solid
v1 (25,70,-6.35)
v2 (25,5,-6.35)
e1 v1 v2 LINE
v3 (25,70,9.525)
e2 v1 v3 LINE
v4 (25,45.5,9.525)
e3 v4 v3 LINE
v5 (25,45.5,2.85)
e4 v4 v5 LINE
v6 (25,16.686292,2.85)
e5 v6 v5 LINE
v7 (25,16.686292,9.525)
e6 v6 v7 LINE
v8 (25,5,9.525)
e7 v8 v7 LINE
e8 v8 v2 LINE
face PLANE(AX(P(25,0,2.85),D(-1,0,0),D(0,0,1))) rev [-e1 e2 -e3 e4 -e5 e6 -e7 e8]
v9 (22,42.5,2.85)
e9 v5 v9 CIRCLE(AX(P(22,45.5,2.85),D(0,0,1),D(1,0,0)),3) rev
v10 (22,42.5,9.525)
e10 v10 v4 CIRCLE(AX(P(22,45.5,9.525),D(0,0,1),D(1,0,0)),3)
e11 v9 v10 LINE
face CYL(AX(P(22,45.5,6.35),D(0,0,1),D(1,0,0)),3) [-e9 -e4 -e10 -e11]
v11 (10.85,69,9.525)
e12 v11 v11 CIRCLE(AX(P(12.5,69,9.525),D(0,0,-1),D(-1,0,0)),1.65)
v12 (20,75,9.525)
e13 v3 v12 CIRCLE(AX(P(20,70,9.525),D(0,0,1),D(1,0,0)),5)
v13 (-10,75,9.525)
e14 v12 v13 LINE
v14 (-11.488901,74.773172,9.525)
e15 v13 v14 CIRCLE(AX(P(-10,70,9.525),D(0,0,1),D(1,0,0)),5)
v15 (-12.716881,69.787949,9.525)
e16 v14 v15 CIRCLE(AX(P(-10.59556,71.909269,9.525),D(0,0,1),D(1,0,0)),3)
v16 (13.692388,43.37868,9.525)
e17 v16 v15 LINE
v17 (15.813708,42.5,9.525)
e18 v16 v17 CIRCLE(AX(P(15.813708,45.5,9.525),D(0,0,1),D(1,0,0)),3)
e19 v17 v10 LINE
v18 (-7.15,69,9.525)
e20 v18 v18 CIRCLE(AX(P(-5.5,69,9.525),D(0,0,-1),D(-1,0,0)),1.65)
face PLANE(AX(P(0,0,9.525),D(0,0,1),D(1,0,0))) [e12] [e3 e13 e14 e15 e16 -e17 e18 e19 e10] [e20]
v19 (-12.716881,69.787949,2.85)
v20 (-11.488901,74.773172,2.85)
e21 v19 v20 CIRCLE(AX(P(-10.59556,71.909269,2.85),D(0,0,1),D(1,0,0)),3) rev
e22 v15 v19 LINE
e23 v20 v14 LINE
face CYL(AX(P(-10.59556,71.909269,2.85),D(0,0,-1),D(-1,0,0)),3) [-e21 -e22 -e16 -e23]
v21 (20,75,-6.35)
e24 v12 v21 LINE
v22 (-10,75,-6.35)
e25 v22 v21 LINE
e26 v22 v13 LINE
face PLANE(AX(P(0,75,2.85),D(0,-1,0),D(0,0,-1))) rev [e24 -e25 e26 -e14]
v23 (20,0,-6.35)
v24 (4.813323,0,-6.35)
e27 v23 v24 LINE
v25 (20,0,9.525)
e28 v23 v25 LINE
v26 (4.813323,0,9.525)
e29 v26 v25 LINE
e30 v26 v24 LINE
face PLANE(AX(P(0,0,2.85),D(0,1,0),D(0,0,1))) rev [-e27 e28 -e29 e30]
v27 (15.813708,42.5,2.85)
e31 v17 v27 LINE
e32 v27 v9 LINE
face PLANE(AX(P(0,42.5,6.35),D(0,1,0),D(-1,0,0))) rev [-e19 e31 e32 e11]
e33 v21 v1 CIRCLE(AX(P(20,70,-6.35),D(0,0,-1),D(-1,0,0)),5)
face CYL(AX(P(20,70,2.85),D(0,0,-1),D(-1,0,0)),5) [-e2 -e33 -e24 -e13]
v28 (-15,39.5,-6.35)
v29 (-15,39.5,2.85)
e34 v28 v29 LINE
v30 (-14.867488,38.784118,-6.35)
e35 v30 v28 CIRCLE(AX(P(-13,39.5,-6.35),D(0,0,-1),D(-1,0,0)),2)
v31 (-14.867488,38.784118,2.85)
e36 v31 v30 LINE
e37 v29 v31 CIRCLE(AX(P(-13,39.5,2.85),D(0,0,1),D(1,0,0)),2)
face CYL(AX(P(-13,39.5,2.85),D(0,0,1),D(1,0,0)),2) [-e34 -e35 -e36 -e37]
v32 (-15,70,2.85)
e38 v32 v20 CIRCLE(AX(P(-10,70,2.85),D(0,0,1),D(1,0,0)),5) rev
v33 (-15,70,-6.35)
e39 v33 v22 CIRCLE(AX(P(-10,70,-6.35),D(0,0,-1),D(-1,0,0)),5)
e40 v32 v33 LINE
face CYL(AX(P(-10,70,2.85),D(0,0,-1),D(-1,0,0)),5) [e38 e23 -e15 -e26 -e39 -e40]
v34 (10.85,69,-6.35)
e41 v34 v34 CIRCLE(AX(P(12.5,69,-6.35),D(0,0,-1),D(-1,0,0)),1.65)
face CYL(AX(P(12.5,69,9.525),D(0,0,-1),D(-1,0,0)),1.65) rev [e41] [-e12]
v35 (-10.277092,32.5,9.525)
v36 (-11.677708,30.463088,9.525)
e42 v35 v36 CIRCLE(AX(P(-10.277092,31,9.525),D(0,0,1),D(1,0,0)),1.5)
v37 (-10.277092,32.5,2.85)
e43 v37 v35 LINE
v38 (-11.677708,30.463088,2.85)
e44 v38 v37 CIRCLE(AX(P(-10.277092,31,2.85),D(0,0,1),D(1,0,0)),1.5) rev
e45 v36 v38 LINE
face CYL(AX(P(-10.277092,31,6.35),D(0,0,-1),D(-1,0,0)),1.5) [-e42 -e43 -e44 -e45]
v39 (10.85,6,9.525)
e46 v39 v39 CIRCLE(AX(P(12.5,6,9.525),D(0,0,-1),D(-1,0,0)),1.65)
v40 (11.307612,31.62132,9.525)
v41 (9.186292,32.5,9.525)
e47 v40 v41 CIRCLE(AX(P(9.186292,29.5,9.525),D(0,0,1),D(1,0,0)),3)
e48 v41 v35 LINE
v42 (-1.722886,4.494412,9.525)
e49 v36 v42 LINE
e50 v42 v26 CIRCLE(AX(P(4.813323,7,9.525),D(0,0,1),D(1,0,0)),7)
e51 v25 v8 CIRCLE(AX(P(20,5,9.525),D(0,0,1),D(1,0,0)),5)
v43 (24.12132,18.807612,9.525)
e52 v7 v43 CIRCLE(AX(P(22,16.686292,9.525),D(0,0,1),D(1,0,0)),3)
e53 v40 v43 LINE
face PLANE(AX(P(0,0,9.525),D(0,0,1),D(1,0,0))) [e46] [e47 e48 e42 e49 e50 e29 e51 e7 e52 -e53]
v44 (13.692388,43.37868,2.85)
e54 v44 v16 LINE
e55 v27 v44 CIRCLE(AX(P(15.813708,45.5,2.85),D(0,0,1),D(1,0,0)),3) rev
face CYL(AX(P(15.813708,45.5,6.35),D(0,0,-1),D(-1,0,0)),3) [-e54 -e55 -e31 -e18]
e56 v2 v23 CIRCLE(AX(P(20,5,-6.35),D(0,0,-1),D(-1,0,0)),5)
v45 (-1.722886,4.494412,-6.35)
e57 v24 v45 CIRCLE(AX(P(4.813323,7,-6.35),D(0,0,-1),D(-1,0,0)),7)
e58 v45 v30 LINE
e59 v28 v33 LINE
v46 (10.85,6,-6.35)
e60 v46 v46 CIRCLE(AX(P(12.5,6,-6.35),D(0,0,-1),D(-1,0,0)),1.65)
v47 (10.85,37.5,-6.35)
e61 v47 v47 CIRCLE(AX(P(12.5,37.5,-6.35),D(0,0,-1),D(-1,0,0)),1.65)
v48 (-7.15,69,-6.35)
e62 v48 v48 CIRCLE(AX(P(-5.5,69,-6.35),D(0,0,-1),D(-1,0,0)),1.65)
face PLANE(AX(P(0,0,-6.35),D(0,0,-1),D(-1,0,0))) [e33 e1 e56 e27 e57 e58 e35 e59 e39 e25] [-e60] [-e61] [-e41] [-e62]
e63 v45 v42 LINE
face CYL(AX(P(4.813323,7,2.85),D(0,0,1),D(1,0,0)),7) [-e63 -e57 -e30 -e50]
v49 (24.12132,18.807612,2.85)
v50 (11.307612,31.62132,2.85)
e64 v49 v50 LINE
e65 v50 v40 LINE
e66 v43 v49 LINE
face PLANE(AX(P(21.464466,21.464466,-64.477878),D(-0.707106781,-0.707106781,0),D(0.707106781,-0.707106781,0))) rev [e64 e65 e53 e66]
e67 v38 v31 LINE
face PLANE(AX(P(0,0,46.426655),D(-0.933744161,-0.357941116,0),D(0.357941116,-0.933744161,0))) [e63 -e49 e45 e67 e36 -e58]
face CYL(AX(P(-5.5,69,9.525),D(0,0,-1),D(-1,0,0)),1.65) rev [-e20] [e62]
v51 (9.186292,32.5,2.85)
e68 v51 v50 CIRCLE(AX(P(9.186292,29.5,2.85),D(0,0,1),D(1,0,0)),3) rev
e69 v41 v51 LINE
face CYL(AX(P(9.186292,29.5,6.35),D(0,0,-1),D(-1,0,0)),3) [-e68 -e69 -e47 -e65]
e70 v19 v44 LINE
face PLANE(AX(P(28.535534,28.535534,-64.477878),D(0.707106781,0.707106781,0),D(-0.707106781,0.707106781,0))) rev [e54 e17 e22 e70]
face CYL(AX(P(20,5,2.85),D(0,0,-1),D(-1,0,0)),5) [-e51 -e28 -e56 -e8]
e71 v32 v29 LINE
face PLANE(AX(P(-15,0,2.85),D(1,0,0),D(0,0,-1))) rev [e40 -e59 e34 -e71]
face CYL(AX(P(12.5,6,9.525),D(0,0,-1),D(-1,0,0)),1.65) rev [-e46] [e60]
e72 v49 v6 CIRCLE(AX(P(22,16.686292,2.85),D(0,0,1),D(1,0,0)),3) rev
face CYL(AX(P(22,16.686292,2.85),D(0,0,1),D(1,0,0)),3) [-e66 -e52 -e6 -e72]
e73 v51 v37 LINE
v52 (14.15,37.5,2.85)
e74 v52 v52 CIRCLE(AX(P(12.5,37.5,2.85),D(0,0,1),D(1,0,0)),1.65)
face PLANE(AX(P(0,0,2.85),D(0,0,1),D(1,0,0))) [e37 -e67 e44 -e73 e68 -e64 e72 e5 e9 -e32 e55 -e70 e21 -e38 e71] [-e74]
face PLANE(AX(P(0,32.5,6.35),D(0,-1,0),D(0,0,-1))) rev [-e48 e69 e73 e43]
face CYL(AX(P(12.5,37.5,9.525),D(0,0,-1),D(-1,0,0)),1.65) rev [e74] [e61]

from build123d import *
from build123d.topology import SkipClean

# Parameters (mm, degrees)
SKETCH1_R           = 1.5
SKETCH1_W           = 15
SKETCH1_H           = 37.5
BOSS_EXTRUDE1_DEPTH = 2.85
FILLET1_R           = 5
FILLET2_R           = 2
BOSS_EXTRUDE2_START = 3.5
SKETCH5_R           = 1.5
BOSS_EXTRUDE2_DEPTH = 3.5
FILLET3_R           = 3.5
FILLET4_R           = 2
FILLET5_R           = 2
SKETCH6_R           = 1.5
CUT_EXTRUDE1_DEPTH  = 10
SKETCH8_R           = 1.5
BOSS_EXTRUDE3_DEPTH = 6.35
BOSS_EXTRUDE4_START = 3.175
SKETCH9_R           = 1.5
BOSS_EXTRUDE4_DEPTH = 3.175
SKETCH10_W          = 40
SKETCH10_H          = 15.399494937
SKETCH10_W_2        = 25
BOSS_EXTRUDE5_DEPTH = 6.675
CUT_EXTRUDE2_START  = -6.675
CUT_EXTRUDE2_DEPTH  = 6.675
BOSS_EXTRUDE6_START = -9.2
BOSS_EXTRUDE6_DEPTH = 9.2
FILLET6_R           = 7
BOSS_EXTRUDE7_DEPTH = 6.675
FILLET7_R           = 3
FILLET8_R           = 1.5
SKETCH15_R          = 1.65
CUT_EXTRUDE3_DEPTH  = 81.63507689


# Read off the part's stored shape, not the designer's step: Cut-Extrude2
with BuildPart() as part:
    # Sketch1 → Boss-Extrude1 (new body)
    # profile 1 of 2: a face of its own
    with BuildSketch(Plane.XY):
        Polygon((0, 37.5), (0, 0), (25, 0), (25, 75), (0, 75), align=None)
        with Locations((12.5, 6)):
            Circle(SKETCH1_R, mode=Mode.SUBTRACT)
        with Locations((12.5, 37.5)):
            Circle(SKETCH1_R, mode=Mode.SUBTRACT)
        with Locations((12.5, 69)):
            Circle(SKETCH1_R, mode=Mode.SUBTRACT)
    # profile 2 of 2: a face of its own
    with BuildSketch(Plane.XY):
        with Locations((-7.5, 56.25)):
            Rectangle(SKETCH1_W, SKETCH1_H)
    extrude(amount=BOSS_EXTRUDE1_DEPTH)

    # Fillet1
    fillet1_edges = [part.edges().sort_by_distance(p)[0] for p in [
        (25, 75, 1.425),
        (25, 0, 1.425),
        (0, 0, 1.425),
        (0, 37.5, 1.425),
        (-15, 75, 1.425),
    ]]
    fillet(fillet1_edges, radius=FILLET1_R)

    # Fillet2
    fillet2_edges = [part.edges().sort_by_distance(p)[0] for p in [
        (-15, 37.5, 1.425),
    ]]
    fillet(fillet2_edges, radius=FILLET2_R)

    # Sketch5 → Boss-Extrude2 (add)
    # profile 1 of 2: a face of its own
    with BuildSketch(Plane.XY.offset(2.85).offset(BOSS_EXTRUDE2_START)):
        with BuildLine():
            Line((-15, 42.5), (10.428932188, 42.5))
            Line((10.428932188, 42.5), (21.464466094, 53.535533906))
            Line((21.464466094, 53.535533906), (25, 57.071067812))
            Line((25, 57.071067812), (25, 70))
            ThreePointArc((25, 70), (23.535533906, 73.535533906), (20, 75))
            Line((20, 75), (-10, 75))
            ThreePointArc((-10, 75), (-13.535533906, 73.535533906), (-15, 70))
            Line((-15, 70), (-15, 42.5))
        make_face()
        with Locations((12.5, 69)):
            Circle(SKETCH5_R, mode=Mode.SUBTRACT)
    # profile 2 of 2: a face of its own
    with BuildSketch(Plane.XY.offset(2.85).offset(BOSS_EXTRUDE2_START)):
        with BuildLine():
            Line((14.571067812, 32.5), (0, 17.928932188))
            Line((0, 17.928932188), (0, 5))
            ThreePointArc((0, 5), (1.464466094, 1.464466094), (5, 0))
            Line((5, 0), (20, 0))
            ThreePointArc((20, 0), (23.535533906, 1.464466094), (25, 5))
            Line((25, 5), (25, 32.5))
            Line((25, 32.5), (14.571067812, 32.5))
        make_face()
        with Locations((12.5, 6)):
            Circle(SKETCH5_R, mode=Mode.SUBTRACT)
    extrude(amount=-BOSS_EXTRUDE2_DEPTH)

    # Fillet3
    fillet3_edges = [part.edges().sort_by_distance(p)[0] for p in [
        (10.428932188, 42.5, 4.6),
        (14.571067812, 32.5, 4.6),
    ]]
    fillet(fillet3_edges, radius=FILLET3_R)

    # Fillet4
    fillet4_edges = [part.edges().sort_by_distance(p)[0] for p in [
        (-15, 42.5, 4.6),
    ]]
    fillet(fillet4_edges, radius=FILLET4_R)

    # Fillet5
    fillet5_edges = [part.edges().sort_by_distance(p)[0] for p in [
        (25, 57.071067812, 4.6),
        (25, 32.5, 4.6),
        (0, 17.928932188, 4.6),
    ]]
    fillet(fillet5_edges, radius=FILLET5_R)

    # Sketch6 → Cut-Extrude1 (cut)
    with BuildSketch(Plane.XY.offset(6.35)):
        with Locations((-5.5, 69)):
            Circle(SKETCH6_R)
    extrude(amount=-CUT_EXTRUDE1_DEPTH, mode=Mode.SUBTRACT)

    # Sketch8 → Boss-Extrude3 (add)
    with SkipClean():  # the faces are left unmerged after this step: merging them gives an invalid solid
        with BuildSketch(Plane(origin=(0, 0, 0), x_dir=(-1, 0, 0), z_dir=(0, 0, -1))):
            with BuildLine():
                ThreePointArc((0, 32.5), (1.464466094, 36.035533906), (5, 37.5))
                Line((5, 37.5), (13, 37.5))
                ThreePointArc((13, 37.5), (14.414213562, 38.085786438), (15, 39.5))
                Line((15, 39.5), (15, 70))
                ThreePointArc((15, 70), (13.535533906, 73.535533906), (10, 75))
                Line((10, 75), (-20, 75))
                ThreePointArc((-20, 75), (-23.535533906, 73.535533906), (-25, 70))
                Line((-25, 70), (-25, 5))
                ThreePointArc((-25, 5), (-23.535533906, 1.464466094), (-20, 0))
                Line((-20, 0), (-5, 0))
                ThreePointArc((-5, 0), (-1.464466094, 1.464466094), (0, 5))
                Line((0, 5), (0, 32.5))
            make_face()
            with Locations((-12.5, 6)):
                Circle(SKETCH8_R, mode=Mode.SUBTRACT)
            with Locations((-12.5, 69)):
                Circle(SKETCH8_R, mode=Mode.SUBTRACT)
            with Locations((-12.5, 37.5)):
                Circle(SKETCH8_R, mode=Mode.SUBTRACT)
            with Locations(Location((5.5, 69, 0), (0, 0, 180))):
                Circle(SKETCH8_R, mode=Mode.SUBTRACT)
        extrude(amount=BOSS_EXTRUDE3_DEPTH)
    add(part.part.scale(1), mode=Mode.REPLACE)  # the faces are merged on a copy

    # Sketch9 → Boss-Extrude4 (add)
    # profile 1 of 2: a face of its own
    with BuildSketch(Plane.XY.offset(6.35).offset(BOSS_EXTRUDE4_START)):
        with BuildLine():
            ThreePointArc((16.02081528, 32.5), (14.681423267, 32.233578364), (13.545941546, 31.474873734))
            Line((13.545941546, 31.474873734), (0.585786438, 18.514718626))
            ThreePointArc((0.585786438, 18.514718626), (0.152240935, 17.865871928), (0, 17.100505063))
            Line((0, 17.100505063), (0, 5))
            ThreePointArc((0, 5), (1.464466094, 1.464466094), (5, 0))
            Line((5, 0), (20, 0))
            ThreePointArc((20, 0), (23.535533906, 1.464466094), (25, 5))
            Line((25, 5), (25, 30.5))
            ThreePointArc((25, 30.5), (24.414213562, 31.914213562), (23, 32.5))
            Line((23, 32.5), (16.02081528, 32.5))
        make_face()
    # profile 2 of 2: a face of its own
    with BuildSketch(Plane.XY.offset(6.35).offset(BOSS_EXTRUDE4_START)):
        with BuildLine():
            ThreePointArc((8.97918472, 42.5), (10.318576733, 42.766421636), (11.454058454, 43.525126266))
            Line((11.454058454, 43.525126266), (24.414213562, 56.485281374))
            ThreePointArc((24.414213562, 56.485281374), (24.847759065, 57.134128072), (25, 57.899494937))
            Line((25, 57.899494937), (25, 70))
            ThreePointArc((25, 70), (23.535533906, 73.535533906), (20, 75))
            Line((20, 75), (-10, 75))
            ThreePointArc((-10, 75), (-13.535533906, 73.535533906), (-15, 70))
            Line((-15, 70), (-15, 44.5))
            ThreePointArc((-15, 44.5), (-14.414213562, 43.085786438), (-13, 42.5))
            Line((-13, 42.5), (8.97918472, 42.5))
        make_face()
        with Locations((-5.5, 69)):
            Circle(SKETCH9_R, mode=Mode.SUBTRACT)
        with Locations((12.5, 69)):
            Circle(SKETCH9_R, mode=Mode.SUBTRACT)
    extrude(amount=-BOSS_EXTRUDE4_DEPTH)

    # Sketch10 → Boss-Extrude5 (add)
    with SkipClean():  # the faces are left unmerged after this step: merging them gives an invalid solid
        with BuildSketch(Plane.XY.offset(9.525)):
            with Locations((5, 50.199747469)):
                Rectangle(SKETCH10_W, SKETCH10_H)
            with Locations((12.5, 24.800252531)):
                Rectangle(SKETCH10_W_2, SKETCH10_H)
        extrude(amount=-BOSS_EXTRUDE5_DEPTH)

    # Cut-Extrude2 outline → Cut-Extrude2 (cut)
    with SkipClean():  # the faces are left unmerged after this step: merging them gives an invalid solid
        with BuildSketch(Plane.XY.offset(9.525).offset(CUT_EXTRUDE2_START)):
            Polygon((25, 32.5), (10.428932188, 32.5), (25, 17.928932188), align=None)
            with BuildLine():
                Line((-15, 42.5), (14.571067812, 42.5))
                Line((14.571067812, 42.5), (-14.682437359, 71.75350517))
                ThreePointArc((-14.682437359, 71.75350517), (-14.919968841, 70.891014367), (-15, 70))
                Line((-15, 70), (-15, 42.5))
            make_face()
        extrude(amount=CUT_EXTRUDE2_DEPTH, mode=Mode.SUBTRACT)

    # Sketch12 → Boss-Extrude6 (add)
    with BuildSketch(Plane(origin=(0, 0, -6.35), x_dir=(-1, 0, 0), z_dir=(0, 0, -1)).offset(BOSS_EXTRUDE6_START)):
        with BuildLine():
            Line((0, 0), (14.867488321, 38.784117768))
            ThreePointArc((14.867488321, 38.784117768), (14.133189202, 37.852006604), (13, 37.5))
            Line((13, 37.5), (5, 37.5))
            ThreePointArc((5, 37.5), (1.464466094, 36.035533906), (0, 32.5))
            Line((0, 32.5), (0, 5))
            ThreePointArc((0, 5), (-1.464466094, 1.464466094), (-5, 0))
            Line((-5, 0), (0, 0))
        make_face()
    extrude(amount=BOSS_EXTRUDE6_DEPTH)

    # Fillet6
    fillet6_edges = [part.edges().sort_by_distance(p)[0] for p in [
        (0, 0, -1.75),
    ]]
    fillet(fillet6_edges, radius=FILLET6_R)

    # Sketch13 → Boss-Extrude7 (add)
    with SkipClean():  # the faces are left unmerged after this step: merging them gives an invalid solid
        with BuildSketch(Plane.XY.offset(9.525)):
            with BuildLine():
                Line((0, 32.5), (0, 5))
                ThreePointArc((0, 5), (1.464466094, 1.464466094), (5, 0))
                Line((5, 0), (4.813322939, 0))
                ThreePointArc((4.813322939, 0), (0.847160732, 1.232023115), (-1.722886185, 4.494412187))
                Line((-1.722886185, 4.494412187), (-12.458537109, 32.5))
                Line((-12.458537109, 32.5), (0, 32.5))
            make_face()
        extrude(amount=-BOSS_EXTRUDE7_DEPTH)

    # Fillet7
    fillet7_edges = [part.edges().sort_by_distance(p)[0] for p in [
        (25, 42.5, 6.1875),
        (14.571067812, 42.5, 6.1875),
        (-14.682437359, 71.75350517, 4.6),
        (10.428932188, 32.5, 6.1875),
        (25, 17.928932188, 6.1875),
    ]]
    fillet(fillet7_edges, radius=FILLET7_R)

    # Fillet8
    # the kernel refuses this fillet: 1.5 mm, written as the material it takes off along each edge
    with BuildSketch(Plane(origin=(-12.458537109, 32.5, 14.978612885), x_dir=(0.35794111613384066, -0.9337441605605148, 0), z_dir=(0, 0, -1))) as fillet8_piece_1:
        with BuildLine():
            CenterArc((FILLET8_R * 1.45429676938, -FILLET8_R), FILLET8_R, 90, 110.97380664)
            Line((FILLET8_R * 0.520552608823, -FILLET8_R * 1.35794111613), (0, 0))
            Line((0, 0), (FILLET8_R * 1.45429676938, 0))
        make_face()
    extrude(amount=12.128612885, mode=Mode.SUBTRACT)

    # Sketch15 → Cut-Extrude3 (cut, through all)
    with BuildSketch(Plane(origin=(0, 0, -6.35), x_dir=(-1, 0, 0), z_dir=(0, 0, -1))):
        with Locations((-12.5, 69)):
            Circle(SKETCH15_R)
        with Locations((-12.5, 37.5)):
            Circle(SKETCH15_R)
        with Locations((-12.5, 6)):
            Circle(SKETCH15_R)
        with Locations((5.5, 69)):
            Circle(SKETCH15_R)
    extrude(amount=-CUT_EXTRUDE3_DEPTH, mode=Mode.SUBTRACT)


solid = part.part
